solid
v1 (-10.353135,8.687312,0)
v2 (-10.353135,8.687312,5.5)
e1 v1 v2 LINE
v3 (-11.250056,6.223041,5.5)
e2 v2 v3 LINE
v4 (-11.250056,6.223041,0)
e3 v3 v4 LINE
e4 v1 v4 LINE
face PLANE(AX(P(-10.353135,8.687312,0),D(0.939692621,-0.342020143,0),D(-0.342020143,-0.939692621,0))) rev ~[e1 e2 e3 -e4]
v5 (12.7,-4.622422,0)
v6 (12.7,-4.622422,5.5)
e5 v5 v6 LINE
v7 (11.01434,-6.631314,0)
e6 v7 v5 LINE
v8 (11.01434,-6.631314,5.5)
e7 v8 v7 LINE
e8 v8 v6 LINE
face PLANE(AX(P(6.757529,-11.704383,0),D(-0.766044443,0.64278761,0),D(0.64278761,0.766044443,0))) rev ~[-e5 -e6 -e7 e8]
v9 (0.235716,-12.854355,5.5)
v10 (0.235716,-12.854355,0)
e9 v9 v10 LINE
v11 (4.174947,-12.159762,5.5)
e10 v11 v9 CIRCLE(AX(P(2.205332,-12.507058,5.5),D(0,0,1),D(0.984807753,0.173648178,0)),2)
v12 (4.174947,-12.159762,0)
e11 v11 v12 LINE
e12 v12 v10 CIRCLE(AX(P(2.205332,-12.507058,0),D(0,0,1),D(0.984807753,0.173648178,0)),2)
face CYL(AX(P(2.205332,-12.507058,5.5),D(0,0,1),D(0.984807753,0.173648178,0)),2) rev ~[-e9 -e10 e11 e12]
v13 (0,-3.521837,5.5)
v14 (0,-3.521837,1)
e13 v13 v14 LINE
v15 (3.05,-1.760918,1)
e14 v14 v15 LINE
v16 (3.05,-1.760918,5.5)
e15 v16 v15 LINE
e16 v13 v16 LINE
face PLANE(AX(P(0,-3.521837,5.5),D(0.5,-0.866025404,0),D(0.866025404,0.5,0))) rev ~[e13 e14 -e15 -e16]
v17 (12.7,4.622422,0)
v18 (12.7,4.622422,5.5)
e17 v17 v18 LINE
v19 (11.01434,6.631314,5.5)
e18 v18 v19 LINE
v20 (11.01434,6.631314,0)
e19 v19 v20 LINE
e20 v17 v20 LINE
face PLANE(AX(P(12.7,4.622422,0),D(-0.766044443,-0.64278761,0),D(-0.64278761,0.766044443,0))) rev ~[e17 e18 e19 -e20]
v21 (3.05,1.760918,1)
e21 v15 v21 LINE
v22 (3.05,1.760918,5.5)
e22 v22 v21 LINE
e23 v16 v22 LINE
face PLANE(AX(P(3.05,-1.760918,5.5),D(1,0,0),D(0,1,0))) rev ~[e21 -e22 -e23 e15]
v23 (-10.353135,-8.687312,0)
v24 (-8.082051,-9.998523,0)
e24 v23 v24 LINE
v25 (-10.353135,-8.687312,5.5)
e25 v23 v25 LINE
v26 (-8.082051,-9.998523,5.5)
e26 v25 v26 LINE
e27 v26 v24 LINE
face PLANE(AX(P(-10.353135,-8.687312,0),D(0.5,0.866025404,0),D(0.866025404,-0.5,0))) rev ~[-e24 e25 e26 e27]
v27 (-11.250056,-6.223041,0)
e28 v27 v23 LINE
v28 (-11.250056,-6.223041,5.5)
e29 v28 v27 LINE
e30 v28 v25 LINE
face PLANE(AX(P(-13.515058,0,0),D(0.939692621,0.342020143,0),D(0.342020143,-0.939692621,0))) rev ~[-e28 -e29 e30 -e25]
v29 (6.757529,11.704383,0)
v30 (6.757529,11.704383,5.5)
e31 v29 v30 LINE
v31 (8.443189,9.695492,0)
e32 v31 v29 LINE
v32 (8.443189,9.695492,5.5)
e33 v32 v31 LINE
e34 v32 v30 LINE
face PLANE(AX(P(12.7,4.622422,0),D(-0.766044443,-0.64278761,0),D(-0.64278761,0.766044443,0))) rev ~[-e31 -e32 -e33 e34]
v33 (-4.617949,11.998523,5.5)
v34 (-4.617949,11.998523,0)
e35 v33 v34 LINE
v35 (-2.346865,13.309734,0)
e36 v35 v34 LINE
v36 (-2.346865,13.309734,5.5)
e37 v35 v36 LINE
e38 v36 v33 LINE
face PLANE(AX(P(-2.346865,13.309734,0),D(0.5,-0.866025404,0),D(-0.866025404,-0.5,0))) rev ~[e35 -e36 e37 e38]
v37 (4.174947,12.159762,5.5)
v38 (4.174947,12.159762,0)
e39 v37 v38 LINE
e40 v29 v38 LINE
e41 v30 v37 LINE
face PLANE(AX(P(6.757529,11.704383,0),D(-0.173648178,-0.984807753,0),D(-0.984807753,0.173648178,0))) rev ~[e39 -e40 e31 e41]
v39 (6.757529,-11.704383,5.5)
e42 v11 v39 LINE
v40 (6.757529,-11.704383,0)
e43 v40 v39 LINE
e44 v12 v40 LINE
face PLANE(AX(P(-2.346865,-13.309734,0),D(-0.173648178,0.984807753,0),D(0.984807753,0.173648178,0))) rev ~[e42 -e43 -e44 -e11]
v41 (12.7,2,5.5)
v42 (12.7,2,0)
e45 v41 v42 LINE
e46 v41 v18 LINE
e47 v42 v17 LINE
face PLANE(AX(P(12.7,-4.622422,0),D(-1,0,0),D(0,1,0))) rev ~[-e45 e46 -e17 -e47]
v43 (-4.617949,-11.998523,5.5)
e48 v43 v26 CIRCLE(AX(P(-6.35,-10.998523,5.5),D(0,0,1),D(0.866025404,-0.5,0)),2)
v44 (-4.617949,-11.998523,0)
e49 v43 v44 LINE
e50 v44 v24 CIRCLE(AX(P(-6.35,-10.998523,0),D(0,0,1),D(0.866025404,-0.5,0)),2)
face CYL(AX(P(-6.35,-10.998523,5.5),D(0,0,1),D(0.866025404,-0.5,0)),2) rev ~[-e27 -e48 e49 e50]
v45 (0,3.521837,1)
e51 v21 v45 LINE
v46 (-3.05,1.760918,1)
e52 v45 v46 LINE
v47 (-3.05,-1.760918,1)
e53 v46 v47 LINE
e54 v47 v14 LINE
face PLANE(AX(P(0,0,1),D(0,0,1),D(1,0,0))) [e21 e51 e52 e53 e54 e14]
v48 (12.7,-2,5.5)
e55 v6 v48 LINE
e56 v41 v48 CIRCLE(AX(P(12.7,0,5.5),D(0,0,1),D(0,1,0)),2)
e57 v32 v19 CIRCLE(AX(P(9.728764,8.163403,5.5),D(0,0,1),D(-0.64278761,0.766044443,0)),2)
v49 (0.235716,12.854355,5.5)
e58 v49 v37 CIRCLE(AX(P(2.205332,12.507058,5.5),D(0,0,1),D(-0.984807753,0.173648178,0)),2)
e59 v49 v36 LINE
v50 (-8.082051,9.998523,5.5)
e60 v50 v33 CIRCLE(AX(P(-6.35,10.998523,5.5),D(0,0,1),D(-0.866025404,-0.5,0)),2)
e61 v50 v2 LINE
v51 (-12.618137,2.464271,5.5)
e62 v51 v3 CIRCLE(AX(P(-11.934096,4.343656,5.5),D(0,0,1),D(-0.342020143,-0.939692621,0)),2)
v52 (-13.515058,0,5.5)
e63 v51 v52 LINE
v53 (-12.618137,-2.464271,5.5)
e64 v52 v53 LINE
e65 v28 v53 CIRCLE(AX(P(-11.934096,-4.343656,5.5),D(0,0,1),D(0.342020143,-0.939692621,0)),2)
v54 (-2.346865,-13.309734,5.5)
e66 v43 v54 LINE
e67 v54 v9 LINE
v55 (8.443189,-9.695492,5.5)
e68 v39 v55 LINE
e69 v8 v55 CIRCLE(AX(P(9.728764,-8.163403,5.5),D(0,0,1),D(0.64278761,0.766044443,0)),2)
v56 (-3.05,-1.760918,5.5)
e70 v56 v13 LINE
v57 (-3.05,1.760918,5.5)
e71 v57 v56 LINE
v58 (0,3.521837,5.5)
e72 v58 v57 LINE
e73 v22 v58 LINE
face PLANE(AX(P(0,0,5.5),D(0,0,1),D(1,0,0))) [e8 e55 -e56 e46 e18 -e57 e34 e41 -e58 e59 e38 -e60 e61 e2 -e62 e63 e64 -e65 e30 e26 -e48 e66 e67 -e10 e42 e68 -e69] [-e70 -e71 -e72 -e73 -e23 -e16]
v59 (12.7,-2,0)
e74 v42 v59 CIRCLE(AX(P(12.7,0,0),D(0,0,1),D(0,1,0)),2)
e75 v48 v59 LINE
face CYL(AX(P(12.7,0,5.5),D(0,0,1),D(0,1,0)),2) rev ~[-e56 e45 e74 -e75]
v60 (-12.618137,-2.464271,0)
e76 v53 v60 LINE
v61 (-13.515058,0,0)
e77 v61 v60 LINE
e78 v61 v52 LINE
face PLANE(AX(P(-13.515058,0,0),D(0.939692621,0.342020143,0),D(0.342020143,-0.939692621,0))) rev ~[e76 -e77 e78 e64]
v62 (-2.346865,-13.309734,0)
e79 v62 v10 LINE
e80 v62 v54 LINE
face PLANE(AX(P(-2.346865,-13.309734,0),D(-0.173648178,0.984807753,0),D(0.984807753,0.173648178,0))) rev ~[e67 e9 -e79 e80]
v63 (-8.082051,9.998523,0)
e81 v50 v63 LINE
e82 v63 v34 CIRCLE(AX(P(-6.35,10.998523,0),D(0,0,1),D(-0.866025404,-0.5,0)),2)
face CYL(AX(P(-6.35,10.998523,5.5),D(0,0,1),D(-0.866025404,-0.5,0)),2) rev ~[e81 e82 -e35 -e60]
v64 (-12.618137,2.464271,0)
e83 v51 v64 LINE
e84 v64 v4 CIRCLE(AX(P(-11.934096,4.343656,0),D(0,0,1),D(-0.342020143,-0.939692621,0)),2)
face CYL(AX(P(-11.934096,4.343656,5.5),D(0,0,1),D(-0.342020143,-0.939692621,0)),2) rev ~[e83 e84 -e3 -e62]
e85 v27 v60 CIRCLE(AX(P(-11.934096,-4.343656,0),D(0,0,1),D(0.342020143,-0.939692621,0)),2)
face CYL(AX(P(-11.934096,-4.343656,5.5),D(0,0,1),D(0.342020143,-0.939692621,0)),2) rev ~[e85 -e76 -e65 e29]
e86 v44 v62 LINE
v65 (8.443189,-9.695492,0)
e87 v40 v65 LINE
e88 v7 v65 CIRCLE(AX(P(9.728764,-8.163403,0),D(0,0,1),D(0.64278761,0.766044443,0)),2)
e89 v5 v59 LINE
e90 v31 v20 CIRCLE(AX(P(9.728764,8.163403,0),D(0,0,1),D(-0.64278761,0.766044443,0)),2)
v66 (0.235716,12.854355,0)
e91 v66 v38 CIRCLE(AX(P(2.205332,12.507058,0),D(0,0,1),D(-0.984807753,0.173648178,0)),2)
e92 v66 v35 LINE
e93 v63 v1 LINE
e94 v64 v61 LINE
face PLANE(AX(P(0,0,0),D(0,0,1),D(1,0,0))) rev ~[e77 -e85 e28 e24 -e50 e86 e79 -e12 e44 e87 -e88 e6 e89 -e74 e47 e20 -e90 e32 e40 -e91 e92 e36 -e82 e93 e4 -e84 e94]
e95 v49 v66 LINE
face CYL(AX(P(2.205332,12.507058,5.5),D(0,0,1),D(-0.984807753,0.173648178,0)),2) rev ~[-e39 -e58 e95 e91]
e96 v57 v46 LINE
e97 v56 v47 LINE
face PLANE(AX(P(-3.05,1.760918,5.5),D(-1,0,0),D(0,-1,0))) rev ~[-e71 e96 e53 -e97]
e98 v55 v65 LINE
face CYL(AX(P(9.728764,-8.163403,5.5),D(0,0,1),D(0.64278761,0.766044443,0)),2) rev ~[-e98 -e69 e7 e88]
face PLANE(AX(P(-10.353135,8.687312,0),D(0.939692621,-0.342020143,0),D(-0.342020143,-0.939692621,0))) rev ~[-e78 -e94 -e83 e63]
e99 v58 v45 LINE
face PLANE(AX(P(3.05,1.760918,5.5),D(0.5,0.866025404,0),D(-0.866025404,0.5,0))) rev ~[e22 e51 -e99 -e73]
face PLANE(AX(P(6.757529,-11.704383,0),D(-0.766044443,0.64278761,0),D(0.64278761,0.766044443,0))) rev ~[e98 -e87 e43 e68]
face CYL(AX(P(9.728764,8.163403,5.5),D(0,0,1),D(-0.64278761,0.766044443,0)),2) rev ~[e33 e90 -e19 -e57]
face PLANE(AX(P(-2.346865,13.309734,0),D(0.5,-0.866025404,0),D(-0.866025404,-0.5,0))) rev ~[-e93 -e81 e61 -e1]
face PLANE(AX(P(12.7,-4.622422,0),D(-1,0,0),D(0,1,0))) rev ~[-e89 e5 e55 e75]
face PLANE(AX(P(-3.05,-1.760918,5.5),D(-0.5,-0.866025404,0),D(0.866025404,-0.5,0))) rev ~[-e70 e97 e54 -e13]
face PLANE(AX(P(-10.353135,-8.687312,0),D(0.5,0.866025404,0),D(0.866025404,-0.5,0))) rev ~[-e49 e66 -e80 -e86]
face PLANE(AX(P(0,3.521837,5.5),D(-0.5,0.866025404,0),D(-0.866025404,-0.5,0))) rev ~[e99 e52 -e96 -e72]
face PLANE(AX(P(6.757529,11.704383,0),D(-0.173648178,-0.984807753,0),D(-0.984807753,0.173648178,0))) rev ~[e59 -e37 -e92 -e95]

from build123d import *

# Parameters (mm, degrees)
F1_DEPTH        = 5.5
F3_DEPTH        = 4.5
F5_DEPTH        = 25.4
F5_COPIES_COUNT = 9


# Not quite as in the source:
# - a pattern or mirror of a feature is missing from the dataset's text; its kind, count and spacing are read off the source's solid


with BuildPart() as f1:
    # F0 (on Top) → F1 (new body)
    with BuildSketch(Plane.XY):
        Polygon((12.7, -4.6224219752), (12.7, 4.6224219752), (6.7575288552, 11.7043833109), (-2.3468651425, 13.3097336157), (-10.3531348575, 8.6873116405), (-13.5150577104, 0), (-10.3531348575, -8.6873116405), (-2.3468651425, -13.3097336157), (6.7575288552, -11.7043833109), align=None)
    extrude(amount=F1_DEPTH)

    # F2 (on face) → F3 (cut)
    with BuildSketch(Plane.XY.offset(5.5)):
        Polygon((3.05, -1.760918321), (3.05, 1.760918321), (0, 3.5218366421), (-3.05, 1.760918321), (-3.05, -1.760918321), (0, -3.5218366421), align=None)
    extrude(amount=-F3_DEPTH, mode=Mode.SUBTRACT)

    # F4 (on face) → F5 (cut)
    with BuildSketch(Plane.XY.offset(5.5)):
        with BuildLine():
            Line((8.4431892082, -9.6954915293), (11.014339647, -6.6313137568))
            ThreePointArc((11.014339647, -6.6313137568), (8.1966755414, -6.8778274236), (8.4431892082, -9.6954915293))
        make_face()
    f5 = extrude(amount=-F5_DEPTH, mode=Mode.SUBTRACT)

    # F5_copies: F5 ×9 about axis
    f5_copies_axis = Axis((0, 0, 0), (0, 0, 1))
    for i in range(1, F5_COPIES_COUNT):
        add(f5.rotate(f5_copies_axis, i * 360 / F5_COPIES_COUNT), mode=Mode.SUBTRACT)


solid = f1.part
